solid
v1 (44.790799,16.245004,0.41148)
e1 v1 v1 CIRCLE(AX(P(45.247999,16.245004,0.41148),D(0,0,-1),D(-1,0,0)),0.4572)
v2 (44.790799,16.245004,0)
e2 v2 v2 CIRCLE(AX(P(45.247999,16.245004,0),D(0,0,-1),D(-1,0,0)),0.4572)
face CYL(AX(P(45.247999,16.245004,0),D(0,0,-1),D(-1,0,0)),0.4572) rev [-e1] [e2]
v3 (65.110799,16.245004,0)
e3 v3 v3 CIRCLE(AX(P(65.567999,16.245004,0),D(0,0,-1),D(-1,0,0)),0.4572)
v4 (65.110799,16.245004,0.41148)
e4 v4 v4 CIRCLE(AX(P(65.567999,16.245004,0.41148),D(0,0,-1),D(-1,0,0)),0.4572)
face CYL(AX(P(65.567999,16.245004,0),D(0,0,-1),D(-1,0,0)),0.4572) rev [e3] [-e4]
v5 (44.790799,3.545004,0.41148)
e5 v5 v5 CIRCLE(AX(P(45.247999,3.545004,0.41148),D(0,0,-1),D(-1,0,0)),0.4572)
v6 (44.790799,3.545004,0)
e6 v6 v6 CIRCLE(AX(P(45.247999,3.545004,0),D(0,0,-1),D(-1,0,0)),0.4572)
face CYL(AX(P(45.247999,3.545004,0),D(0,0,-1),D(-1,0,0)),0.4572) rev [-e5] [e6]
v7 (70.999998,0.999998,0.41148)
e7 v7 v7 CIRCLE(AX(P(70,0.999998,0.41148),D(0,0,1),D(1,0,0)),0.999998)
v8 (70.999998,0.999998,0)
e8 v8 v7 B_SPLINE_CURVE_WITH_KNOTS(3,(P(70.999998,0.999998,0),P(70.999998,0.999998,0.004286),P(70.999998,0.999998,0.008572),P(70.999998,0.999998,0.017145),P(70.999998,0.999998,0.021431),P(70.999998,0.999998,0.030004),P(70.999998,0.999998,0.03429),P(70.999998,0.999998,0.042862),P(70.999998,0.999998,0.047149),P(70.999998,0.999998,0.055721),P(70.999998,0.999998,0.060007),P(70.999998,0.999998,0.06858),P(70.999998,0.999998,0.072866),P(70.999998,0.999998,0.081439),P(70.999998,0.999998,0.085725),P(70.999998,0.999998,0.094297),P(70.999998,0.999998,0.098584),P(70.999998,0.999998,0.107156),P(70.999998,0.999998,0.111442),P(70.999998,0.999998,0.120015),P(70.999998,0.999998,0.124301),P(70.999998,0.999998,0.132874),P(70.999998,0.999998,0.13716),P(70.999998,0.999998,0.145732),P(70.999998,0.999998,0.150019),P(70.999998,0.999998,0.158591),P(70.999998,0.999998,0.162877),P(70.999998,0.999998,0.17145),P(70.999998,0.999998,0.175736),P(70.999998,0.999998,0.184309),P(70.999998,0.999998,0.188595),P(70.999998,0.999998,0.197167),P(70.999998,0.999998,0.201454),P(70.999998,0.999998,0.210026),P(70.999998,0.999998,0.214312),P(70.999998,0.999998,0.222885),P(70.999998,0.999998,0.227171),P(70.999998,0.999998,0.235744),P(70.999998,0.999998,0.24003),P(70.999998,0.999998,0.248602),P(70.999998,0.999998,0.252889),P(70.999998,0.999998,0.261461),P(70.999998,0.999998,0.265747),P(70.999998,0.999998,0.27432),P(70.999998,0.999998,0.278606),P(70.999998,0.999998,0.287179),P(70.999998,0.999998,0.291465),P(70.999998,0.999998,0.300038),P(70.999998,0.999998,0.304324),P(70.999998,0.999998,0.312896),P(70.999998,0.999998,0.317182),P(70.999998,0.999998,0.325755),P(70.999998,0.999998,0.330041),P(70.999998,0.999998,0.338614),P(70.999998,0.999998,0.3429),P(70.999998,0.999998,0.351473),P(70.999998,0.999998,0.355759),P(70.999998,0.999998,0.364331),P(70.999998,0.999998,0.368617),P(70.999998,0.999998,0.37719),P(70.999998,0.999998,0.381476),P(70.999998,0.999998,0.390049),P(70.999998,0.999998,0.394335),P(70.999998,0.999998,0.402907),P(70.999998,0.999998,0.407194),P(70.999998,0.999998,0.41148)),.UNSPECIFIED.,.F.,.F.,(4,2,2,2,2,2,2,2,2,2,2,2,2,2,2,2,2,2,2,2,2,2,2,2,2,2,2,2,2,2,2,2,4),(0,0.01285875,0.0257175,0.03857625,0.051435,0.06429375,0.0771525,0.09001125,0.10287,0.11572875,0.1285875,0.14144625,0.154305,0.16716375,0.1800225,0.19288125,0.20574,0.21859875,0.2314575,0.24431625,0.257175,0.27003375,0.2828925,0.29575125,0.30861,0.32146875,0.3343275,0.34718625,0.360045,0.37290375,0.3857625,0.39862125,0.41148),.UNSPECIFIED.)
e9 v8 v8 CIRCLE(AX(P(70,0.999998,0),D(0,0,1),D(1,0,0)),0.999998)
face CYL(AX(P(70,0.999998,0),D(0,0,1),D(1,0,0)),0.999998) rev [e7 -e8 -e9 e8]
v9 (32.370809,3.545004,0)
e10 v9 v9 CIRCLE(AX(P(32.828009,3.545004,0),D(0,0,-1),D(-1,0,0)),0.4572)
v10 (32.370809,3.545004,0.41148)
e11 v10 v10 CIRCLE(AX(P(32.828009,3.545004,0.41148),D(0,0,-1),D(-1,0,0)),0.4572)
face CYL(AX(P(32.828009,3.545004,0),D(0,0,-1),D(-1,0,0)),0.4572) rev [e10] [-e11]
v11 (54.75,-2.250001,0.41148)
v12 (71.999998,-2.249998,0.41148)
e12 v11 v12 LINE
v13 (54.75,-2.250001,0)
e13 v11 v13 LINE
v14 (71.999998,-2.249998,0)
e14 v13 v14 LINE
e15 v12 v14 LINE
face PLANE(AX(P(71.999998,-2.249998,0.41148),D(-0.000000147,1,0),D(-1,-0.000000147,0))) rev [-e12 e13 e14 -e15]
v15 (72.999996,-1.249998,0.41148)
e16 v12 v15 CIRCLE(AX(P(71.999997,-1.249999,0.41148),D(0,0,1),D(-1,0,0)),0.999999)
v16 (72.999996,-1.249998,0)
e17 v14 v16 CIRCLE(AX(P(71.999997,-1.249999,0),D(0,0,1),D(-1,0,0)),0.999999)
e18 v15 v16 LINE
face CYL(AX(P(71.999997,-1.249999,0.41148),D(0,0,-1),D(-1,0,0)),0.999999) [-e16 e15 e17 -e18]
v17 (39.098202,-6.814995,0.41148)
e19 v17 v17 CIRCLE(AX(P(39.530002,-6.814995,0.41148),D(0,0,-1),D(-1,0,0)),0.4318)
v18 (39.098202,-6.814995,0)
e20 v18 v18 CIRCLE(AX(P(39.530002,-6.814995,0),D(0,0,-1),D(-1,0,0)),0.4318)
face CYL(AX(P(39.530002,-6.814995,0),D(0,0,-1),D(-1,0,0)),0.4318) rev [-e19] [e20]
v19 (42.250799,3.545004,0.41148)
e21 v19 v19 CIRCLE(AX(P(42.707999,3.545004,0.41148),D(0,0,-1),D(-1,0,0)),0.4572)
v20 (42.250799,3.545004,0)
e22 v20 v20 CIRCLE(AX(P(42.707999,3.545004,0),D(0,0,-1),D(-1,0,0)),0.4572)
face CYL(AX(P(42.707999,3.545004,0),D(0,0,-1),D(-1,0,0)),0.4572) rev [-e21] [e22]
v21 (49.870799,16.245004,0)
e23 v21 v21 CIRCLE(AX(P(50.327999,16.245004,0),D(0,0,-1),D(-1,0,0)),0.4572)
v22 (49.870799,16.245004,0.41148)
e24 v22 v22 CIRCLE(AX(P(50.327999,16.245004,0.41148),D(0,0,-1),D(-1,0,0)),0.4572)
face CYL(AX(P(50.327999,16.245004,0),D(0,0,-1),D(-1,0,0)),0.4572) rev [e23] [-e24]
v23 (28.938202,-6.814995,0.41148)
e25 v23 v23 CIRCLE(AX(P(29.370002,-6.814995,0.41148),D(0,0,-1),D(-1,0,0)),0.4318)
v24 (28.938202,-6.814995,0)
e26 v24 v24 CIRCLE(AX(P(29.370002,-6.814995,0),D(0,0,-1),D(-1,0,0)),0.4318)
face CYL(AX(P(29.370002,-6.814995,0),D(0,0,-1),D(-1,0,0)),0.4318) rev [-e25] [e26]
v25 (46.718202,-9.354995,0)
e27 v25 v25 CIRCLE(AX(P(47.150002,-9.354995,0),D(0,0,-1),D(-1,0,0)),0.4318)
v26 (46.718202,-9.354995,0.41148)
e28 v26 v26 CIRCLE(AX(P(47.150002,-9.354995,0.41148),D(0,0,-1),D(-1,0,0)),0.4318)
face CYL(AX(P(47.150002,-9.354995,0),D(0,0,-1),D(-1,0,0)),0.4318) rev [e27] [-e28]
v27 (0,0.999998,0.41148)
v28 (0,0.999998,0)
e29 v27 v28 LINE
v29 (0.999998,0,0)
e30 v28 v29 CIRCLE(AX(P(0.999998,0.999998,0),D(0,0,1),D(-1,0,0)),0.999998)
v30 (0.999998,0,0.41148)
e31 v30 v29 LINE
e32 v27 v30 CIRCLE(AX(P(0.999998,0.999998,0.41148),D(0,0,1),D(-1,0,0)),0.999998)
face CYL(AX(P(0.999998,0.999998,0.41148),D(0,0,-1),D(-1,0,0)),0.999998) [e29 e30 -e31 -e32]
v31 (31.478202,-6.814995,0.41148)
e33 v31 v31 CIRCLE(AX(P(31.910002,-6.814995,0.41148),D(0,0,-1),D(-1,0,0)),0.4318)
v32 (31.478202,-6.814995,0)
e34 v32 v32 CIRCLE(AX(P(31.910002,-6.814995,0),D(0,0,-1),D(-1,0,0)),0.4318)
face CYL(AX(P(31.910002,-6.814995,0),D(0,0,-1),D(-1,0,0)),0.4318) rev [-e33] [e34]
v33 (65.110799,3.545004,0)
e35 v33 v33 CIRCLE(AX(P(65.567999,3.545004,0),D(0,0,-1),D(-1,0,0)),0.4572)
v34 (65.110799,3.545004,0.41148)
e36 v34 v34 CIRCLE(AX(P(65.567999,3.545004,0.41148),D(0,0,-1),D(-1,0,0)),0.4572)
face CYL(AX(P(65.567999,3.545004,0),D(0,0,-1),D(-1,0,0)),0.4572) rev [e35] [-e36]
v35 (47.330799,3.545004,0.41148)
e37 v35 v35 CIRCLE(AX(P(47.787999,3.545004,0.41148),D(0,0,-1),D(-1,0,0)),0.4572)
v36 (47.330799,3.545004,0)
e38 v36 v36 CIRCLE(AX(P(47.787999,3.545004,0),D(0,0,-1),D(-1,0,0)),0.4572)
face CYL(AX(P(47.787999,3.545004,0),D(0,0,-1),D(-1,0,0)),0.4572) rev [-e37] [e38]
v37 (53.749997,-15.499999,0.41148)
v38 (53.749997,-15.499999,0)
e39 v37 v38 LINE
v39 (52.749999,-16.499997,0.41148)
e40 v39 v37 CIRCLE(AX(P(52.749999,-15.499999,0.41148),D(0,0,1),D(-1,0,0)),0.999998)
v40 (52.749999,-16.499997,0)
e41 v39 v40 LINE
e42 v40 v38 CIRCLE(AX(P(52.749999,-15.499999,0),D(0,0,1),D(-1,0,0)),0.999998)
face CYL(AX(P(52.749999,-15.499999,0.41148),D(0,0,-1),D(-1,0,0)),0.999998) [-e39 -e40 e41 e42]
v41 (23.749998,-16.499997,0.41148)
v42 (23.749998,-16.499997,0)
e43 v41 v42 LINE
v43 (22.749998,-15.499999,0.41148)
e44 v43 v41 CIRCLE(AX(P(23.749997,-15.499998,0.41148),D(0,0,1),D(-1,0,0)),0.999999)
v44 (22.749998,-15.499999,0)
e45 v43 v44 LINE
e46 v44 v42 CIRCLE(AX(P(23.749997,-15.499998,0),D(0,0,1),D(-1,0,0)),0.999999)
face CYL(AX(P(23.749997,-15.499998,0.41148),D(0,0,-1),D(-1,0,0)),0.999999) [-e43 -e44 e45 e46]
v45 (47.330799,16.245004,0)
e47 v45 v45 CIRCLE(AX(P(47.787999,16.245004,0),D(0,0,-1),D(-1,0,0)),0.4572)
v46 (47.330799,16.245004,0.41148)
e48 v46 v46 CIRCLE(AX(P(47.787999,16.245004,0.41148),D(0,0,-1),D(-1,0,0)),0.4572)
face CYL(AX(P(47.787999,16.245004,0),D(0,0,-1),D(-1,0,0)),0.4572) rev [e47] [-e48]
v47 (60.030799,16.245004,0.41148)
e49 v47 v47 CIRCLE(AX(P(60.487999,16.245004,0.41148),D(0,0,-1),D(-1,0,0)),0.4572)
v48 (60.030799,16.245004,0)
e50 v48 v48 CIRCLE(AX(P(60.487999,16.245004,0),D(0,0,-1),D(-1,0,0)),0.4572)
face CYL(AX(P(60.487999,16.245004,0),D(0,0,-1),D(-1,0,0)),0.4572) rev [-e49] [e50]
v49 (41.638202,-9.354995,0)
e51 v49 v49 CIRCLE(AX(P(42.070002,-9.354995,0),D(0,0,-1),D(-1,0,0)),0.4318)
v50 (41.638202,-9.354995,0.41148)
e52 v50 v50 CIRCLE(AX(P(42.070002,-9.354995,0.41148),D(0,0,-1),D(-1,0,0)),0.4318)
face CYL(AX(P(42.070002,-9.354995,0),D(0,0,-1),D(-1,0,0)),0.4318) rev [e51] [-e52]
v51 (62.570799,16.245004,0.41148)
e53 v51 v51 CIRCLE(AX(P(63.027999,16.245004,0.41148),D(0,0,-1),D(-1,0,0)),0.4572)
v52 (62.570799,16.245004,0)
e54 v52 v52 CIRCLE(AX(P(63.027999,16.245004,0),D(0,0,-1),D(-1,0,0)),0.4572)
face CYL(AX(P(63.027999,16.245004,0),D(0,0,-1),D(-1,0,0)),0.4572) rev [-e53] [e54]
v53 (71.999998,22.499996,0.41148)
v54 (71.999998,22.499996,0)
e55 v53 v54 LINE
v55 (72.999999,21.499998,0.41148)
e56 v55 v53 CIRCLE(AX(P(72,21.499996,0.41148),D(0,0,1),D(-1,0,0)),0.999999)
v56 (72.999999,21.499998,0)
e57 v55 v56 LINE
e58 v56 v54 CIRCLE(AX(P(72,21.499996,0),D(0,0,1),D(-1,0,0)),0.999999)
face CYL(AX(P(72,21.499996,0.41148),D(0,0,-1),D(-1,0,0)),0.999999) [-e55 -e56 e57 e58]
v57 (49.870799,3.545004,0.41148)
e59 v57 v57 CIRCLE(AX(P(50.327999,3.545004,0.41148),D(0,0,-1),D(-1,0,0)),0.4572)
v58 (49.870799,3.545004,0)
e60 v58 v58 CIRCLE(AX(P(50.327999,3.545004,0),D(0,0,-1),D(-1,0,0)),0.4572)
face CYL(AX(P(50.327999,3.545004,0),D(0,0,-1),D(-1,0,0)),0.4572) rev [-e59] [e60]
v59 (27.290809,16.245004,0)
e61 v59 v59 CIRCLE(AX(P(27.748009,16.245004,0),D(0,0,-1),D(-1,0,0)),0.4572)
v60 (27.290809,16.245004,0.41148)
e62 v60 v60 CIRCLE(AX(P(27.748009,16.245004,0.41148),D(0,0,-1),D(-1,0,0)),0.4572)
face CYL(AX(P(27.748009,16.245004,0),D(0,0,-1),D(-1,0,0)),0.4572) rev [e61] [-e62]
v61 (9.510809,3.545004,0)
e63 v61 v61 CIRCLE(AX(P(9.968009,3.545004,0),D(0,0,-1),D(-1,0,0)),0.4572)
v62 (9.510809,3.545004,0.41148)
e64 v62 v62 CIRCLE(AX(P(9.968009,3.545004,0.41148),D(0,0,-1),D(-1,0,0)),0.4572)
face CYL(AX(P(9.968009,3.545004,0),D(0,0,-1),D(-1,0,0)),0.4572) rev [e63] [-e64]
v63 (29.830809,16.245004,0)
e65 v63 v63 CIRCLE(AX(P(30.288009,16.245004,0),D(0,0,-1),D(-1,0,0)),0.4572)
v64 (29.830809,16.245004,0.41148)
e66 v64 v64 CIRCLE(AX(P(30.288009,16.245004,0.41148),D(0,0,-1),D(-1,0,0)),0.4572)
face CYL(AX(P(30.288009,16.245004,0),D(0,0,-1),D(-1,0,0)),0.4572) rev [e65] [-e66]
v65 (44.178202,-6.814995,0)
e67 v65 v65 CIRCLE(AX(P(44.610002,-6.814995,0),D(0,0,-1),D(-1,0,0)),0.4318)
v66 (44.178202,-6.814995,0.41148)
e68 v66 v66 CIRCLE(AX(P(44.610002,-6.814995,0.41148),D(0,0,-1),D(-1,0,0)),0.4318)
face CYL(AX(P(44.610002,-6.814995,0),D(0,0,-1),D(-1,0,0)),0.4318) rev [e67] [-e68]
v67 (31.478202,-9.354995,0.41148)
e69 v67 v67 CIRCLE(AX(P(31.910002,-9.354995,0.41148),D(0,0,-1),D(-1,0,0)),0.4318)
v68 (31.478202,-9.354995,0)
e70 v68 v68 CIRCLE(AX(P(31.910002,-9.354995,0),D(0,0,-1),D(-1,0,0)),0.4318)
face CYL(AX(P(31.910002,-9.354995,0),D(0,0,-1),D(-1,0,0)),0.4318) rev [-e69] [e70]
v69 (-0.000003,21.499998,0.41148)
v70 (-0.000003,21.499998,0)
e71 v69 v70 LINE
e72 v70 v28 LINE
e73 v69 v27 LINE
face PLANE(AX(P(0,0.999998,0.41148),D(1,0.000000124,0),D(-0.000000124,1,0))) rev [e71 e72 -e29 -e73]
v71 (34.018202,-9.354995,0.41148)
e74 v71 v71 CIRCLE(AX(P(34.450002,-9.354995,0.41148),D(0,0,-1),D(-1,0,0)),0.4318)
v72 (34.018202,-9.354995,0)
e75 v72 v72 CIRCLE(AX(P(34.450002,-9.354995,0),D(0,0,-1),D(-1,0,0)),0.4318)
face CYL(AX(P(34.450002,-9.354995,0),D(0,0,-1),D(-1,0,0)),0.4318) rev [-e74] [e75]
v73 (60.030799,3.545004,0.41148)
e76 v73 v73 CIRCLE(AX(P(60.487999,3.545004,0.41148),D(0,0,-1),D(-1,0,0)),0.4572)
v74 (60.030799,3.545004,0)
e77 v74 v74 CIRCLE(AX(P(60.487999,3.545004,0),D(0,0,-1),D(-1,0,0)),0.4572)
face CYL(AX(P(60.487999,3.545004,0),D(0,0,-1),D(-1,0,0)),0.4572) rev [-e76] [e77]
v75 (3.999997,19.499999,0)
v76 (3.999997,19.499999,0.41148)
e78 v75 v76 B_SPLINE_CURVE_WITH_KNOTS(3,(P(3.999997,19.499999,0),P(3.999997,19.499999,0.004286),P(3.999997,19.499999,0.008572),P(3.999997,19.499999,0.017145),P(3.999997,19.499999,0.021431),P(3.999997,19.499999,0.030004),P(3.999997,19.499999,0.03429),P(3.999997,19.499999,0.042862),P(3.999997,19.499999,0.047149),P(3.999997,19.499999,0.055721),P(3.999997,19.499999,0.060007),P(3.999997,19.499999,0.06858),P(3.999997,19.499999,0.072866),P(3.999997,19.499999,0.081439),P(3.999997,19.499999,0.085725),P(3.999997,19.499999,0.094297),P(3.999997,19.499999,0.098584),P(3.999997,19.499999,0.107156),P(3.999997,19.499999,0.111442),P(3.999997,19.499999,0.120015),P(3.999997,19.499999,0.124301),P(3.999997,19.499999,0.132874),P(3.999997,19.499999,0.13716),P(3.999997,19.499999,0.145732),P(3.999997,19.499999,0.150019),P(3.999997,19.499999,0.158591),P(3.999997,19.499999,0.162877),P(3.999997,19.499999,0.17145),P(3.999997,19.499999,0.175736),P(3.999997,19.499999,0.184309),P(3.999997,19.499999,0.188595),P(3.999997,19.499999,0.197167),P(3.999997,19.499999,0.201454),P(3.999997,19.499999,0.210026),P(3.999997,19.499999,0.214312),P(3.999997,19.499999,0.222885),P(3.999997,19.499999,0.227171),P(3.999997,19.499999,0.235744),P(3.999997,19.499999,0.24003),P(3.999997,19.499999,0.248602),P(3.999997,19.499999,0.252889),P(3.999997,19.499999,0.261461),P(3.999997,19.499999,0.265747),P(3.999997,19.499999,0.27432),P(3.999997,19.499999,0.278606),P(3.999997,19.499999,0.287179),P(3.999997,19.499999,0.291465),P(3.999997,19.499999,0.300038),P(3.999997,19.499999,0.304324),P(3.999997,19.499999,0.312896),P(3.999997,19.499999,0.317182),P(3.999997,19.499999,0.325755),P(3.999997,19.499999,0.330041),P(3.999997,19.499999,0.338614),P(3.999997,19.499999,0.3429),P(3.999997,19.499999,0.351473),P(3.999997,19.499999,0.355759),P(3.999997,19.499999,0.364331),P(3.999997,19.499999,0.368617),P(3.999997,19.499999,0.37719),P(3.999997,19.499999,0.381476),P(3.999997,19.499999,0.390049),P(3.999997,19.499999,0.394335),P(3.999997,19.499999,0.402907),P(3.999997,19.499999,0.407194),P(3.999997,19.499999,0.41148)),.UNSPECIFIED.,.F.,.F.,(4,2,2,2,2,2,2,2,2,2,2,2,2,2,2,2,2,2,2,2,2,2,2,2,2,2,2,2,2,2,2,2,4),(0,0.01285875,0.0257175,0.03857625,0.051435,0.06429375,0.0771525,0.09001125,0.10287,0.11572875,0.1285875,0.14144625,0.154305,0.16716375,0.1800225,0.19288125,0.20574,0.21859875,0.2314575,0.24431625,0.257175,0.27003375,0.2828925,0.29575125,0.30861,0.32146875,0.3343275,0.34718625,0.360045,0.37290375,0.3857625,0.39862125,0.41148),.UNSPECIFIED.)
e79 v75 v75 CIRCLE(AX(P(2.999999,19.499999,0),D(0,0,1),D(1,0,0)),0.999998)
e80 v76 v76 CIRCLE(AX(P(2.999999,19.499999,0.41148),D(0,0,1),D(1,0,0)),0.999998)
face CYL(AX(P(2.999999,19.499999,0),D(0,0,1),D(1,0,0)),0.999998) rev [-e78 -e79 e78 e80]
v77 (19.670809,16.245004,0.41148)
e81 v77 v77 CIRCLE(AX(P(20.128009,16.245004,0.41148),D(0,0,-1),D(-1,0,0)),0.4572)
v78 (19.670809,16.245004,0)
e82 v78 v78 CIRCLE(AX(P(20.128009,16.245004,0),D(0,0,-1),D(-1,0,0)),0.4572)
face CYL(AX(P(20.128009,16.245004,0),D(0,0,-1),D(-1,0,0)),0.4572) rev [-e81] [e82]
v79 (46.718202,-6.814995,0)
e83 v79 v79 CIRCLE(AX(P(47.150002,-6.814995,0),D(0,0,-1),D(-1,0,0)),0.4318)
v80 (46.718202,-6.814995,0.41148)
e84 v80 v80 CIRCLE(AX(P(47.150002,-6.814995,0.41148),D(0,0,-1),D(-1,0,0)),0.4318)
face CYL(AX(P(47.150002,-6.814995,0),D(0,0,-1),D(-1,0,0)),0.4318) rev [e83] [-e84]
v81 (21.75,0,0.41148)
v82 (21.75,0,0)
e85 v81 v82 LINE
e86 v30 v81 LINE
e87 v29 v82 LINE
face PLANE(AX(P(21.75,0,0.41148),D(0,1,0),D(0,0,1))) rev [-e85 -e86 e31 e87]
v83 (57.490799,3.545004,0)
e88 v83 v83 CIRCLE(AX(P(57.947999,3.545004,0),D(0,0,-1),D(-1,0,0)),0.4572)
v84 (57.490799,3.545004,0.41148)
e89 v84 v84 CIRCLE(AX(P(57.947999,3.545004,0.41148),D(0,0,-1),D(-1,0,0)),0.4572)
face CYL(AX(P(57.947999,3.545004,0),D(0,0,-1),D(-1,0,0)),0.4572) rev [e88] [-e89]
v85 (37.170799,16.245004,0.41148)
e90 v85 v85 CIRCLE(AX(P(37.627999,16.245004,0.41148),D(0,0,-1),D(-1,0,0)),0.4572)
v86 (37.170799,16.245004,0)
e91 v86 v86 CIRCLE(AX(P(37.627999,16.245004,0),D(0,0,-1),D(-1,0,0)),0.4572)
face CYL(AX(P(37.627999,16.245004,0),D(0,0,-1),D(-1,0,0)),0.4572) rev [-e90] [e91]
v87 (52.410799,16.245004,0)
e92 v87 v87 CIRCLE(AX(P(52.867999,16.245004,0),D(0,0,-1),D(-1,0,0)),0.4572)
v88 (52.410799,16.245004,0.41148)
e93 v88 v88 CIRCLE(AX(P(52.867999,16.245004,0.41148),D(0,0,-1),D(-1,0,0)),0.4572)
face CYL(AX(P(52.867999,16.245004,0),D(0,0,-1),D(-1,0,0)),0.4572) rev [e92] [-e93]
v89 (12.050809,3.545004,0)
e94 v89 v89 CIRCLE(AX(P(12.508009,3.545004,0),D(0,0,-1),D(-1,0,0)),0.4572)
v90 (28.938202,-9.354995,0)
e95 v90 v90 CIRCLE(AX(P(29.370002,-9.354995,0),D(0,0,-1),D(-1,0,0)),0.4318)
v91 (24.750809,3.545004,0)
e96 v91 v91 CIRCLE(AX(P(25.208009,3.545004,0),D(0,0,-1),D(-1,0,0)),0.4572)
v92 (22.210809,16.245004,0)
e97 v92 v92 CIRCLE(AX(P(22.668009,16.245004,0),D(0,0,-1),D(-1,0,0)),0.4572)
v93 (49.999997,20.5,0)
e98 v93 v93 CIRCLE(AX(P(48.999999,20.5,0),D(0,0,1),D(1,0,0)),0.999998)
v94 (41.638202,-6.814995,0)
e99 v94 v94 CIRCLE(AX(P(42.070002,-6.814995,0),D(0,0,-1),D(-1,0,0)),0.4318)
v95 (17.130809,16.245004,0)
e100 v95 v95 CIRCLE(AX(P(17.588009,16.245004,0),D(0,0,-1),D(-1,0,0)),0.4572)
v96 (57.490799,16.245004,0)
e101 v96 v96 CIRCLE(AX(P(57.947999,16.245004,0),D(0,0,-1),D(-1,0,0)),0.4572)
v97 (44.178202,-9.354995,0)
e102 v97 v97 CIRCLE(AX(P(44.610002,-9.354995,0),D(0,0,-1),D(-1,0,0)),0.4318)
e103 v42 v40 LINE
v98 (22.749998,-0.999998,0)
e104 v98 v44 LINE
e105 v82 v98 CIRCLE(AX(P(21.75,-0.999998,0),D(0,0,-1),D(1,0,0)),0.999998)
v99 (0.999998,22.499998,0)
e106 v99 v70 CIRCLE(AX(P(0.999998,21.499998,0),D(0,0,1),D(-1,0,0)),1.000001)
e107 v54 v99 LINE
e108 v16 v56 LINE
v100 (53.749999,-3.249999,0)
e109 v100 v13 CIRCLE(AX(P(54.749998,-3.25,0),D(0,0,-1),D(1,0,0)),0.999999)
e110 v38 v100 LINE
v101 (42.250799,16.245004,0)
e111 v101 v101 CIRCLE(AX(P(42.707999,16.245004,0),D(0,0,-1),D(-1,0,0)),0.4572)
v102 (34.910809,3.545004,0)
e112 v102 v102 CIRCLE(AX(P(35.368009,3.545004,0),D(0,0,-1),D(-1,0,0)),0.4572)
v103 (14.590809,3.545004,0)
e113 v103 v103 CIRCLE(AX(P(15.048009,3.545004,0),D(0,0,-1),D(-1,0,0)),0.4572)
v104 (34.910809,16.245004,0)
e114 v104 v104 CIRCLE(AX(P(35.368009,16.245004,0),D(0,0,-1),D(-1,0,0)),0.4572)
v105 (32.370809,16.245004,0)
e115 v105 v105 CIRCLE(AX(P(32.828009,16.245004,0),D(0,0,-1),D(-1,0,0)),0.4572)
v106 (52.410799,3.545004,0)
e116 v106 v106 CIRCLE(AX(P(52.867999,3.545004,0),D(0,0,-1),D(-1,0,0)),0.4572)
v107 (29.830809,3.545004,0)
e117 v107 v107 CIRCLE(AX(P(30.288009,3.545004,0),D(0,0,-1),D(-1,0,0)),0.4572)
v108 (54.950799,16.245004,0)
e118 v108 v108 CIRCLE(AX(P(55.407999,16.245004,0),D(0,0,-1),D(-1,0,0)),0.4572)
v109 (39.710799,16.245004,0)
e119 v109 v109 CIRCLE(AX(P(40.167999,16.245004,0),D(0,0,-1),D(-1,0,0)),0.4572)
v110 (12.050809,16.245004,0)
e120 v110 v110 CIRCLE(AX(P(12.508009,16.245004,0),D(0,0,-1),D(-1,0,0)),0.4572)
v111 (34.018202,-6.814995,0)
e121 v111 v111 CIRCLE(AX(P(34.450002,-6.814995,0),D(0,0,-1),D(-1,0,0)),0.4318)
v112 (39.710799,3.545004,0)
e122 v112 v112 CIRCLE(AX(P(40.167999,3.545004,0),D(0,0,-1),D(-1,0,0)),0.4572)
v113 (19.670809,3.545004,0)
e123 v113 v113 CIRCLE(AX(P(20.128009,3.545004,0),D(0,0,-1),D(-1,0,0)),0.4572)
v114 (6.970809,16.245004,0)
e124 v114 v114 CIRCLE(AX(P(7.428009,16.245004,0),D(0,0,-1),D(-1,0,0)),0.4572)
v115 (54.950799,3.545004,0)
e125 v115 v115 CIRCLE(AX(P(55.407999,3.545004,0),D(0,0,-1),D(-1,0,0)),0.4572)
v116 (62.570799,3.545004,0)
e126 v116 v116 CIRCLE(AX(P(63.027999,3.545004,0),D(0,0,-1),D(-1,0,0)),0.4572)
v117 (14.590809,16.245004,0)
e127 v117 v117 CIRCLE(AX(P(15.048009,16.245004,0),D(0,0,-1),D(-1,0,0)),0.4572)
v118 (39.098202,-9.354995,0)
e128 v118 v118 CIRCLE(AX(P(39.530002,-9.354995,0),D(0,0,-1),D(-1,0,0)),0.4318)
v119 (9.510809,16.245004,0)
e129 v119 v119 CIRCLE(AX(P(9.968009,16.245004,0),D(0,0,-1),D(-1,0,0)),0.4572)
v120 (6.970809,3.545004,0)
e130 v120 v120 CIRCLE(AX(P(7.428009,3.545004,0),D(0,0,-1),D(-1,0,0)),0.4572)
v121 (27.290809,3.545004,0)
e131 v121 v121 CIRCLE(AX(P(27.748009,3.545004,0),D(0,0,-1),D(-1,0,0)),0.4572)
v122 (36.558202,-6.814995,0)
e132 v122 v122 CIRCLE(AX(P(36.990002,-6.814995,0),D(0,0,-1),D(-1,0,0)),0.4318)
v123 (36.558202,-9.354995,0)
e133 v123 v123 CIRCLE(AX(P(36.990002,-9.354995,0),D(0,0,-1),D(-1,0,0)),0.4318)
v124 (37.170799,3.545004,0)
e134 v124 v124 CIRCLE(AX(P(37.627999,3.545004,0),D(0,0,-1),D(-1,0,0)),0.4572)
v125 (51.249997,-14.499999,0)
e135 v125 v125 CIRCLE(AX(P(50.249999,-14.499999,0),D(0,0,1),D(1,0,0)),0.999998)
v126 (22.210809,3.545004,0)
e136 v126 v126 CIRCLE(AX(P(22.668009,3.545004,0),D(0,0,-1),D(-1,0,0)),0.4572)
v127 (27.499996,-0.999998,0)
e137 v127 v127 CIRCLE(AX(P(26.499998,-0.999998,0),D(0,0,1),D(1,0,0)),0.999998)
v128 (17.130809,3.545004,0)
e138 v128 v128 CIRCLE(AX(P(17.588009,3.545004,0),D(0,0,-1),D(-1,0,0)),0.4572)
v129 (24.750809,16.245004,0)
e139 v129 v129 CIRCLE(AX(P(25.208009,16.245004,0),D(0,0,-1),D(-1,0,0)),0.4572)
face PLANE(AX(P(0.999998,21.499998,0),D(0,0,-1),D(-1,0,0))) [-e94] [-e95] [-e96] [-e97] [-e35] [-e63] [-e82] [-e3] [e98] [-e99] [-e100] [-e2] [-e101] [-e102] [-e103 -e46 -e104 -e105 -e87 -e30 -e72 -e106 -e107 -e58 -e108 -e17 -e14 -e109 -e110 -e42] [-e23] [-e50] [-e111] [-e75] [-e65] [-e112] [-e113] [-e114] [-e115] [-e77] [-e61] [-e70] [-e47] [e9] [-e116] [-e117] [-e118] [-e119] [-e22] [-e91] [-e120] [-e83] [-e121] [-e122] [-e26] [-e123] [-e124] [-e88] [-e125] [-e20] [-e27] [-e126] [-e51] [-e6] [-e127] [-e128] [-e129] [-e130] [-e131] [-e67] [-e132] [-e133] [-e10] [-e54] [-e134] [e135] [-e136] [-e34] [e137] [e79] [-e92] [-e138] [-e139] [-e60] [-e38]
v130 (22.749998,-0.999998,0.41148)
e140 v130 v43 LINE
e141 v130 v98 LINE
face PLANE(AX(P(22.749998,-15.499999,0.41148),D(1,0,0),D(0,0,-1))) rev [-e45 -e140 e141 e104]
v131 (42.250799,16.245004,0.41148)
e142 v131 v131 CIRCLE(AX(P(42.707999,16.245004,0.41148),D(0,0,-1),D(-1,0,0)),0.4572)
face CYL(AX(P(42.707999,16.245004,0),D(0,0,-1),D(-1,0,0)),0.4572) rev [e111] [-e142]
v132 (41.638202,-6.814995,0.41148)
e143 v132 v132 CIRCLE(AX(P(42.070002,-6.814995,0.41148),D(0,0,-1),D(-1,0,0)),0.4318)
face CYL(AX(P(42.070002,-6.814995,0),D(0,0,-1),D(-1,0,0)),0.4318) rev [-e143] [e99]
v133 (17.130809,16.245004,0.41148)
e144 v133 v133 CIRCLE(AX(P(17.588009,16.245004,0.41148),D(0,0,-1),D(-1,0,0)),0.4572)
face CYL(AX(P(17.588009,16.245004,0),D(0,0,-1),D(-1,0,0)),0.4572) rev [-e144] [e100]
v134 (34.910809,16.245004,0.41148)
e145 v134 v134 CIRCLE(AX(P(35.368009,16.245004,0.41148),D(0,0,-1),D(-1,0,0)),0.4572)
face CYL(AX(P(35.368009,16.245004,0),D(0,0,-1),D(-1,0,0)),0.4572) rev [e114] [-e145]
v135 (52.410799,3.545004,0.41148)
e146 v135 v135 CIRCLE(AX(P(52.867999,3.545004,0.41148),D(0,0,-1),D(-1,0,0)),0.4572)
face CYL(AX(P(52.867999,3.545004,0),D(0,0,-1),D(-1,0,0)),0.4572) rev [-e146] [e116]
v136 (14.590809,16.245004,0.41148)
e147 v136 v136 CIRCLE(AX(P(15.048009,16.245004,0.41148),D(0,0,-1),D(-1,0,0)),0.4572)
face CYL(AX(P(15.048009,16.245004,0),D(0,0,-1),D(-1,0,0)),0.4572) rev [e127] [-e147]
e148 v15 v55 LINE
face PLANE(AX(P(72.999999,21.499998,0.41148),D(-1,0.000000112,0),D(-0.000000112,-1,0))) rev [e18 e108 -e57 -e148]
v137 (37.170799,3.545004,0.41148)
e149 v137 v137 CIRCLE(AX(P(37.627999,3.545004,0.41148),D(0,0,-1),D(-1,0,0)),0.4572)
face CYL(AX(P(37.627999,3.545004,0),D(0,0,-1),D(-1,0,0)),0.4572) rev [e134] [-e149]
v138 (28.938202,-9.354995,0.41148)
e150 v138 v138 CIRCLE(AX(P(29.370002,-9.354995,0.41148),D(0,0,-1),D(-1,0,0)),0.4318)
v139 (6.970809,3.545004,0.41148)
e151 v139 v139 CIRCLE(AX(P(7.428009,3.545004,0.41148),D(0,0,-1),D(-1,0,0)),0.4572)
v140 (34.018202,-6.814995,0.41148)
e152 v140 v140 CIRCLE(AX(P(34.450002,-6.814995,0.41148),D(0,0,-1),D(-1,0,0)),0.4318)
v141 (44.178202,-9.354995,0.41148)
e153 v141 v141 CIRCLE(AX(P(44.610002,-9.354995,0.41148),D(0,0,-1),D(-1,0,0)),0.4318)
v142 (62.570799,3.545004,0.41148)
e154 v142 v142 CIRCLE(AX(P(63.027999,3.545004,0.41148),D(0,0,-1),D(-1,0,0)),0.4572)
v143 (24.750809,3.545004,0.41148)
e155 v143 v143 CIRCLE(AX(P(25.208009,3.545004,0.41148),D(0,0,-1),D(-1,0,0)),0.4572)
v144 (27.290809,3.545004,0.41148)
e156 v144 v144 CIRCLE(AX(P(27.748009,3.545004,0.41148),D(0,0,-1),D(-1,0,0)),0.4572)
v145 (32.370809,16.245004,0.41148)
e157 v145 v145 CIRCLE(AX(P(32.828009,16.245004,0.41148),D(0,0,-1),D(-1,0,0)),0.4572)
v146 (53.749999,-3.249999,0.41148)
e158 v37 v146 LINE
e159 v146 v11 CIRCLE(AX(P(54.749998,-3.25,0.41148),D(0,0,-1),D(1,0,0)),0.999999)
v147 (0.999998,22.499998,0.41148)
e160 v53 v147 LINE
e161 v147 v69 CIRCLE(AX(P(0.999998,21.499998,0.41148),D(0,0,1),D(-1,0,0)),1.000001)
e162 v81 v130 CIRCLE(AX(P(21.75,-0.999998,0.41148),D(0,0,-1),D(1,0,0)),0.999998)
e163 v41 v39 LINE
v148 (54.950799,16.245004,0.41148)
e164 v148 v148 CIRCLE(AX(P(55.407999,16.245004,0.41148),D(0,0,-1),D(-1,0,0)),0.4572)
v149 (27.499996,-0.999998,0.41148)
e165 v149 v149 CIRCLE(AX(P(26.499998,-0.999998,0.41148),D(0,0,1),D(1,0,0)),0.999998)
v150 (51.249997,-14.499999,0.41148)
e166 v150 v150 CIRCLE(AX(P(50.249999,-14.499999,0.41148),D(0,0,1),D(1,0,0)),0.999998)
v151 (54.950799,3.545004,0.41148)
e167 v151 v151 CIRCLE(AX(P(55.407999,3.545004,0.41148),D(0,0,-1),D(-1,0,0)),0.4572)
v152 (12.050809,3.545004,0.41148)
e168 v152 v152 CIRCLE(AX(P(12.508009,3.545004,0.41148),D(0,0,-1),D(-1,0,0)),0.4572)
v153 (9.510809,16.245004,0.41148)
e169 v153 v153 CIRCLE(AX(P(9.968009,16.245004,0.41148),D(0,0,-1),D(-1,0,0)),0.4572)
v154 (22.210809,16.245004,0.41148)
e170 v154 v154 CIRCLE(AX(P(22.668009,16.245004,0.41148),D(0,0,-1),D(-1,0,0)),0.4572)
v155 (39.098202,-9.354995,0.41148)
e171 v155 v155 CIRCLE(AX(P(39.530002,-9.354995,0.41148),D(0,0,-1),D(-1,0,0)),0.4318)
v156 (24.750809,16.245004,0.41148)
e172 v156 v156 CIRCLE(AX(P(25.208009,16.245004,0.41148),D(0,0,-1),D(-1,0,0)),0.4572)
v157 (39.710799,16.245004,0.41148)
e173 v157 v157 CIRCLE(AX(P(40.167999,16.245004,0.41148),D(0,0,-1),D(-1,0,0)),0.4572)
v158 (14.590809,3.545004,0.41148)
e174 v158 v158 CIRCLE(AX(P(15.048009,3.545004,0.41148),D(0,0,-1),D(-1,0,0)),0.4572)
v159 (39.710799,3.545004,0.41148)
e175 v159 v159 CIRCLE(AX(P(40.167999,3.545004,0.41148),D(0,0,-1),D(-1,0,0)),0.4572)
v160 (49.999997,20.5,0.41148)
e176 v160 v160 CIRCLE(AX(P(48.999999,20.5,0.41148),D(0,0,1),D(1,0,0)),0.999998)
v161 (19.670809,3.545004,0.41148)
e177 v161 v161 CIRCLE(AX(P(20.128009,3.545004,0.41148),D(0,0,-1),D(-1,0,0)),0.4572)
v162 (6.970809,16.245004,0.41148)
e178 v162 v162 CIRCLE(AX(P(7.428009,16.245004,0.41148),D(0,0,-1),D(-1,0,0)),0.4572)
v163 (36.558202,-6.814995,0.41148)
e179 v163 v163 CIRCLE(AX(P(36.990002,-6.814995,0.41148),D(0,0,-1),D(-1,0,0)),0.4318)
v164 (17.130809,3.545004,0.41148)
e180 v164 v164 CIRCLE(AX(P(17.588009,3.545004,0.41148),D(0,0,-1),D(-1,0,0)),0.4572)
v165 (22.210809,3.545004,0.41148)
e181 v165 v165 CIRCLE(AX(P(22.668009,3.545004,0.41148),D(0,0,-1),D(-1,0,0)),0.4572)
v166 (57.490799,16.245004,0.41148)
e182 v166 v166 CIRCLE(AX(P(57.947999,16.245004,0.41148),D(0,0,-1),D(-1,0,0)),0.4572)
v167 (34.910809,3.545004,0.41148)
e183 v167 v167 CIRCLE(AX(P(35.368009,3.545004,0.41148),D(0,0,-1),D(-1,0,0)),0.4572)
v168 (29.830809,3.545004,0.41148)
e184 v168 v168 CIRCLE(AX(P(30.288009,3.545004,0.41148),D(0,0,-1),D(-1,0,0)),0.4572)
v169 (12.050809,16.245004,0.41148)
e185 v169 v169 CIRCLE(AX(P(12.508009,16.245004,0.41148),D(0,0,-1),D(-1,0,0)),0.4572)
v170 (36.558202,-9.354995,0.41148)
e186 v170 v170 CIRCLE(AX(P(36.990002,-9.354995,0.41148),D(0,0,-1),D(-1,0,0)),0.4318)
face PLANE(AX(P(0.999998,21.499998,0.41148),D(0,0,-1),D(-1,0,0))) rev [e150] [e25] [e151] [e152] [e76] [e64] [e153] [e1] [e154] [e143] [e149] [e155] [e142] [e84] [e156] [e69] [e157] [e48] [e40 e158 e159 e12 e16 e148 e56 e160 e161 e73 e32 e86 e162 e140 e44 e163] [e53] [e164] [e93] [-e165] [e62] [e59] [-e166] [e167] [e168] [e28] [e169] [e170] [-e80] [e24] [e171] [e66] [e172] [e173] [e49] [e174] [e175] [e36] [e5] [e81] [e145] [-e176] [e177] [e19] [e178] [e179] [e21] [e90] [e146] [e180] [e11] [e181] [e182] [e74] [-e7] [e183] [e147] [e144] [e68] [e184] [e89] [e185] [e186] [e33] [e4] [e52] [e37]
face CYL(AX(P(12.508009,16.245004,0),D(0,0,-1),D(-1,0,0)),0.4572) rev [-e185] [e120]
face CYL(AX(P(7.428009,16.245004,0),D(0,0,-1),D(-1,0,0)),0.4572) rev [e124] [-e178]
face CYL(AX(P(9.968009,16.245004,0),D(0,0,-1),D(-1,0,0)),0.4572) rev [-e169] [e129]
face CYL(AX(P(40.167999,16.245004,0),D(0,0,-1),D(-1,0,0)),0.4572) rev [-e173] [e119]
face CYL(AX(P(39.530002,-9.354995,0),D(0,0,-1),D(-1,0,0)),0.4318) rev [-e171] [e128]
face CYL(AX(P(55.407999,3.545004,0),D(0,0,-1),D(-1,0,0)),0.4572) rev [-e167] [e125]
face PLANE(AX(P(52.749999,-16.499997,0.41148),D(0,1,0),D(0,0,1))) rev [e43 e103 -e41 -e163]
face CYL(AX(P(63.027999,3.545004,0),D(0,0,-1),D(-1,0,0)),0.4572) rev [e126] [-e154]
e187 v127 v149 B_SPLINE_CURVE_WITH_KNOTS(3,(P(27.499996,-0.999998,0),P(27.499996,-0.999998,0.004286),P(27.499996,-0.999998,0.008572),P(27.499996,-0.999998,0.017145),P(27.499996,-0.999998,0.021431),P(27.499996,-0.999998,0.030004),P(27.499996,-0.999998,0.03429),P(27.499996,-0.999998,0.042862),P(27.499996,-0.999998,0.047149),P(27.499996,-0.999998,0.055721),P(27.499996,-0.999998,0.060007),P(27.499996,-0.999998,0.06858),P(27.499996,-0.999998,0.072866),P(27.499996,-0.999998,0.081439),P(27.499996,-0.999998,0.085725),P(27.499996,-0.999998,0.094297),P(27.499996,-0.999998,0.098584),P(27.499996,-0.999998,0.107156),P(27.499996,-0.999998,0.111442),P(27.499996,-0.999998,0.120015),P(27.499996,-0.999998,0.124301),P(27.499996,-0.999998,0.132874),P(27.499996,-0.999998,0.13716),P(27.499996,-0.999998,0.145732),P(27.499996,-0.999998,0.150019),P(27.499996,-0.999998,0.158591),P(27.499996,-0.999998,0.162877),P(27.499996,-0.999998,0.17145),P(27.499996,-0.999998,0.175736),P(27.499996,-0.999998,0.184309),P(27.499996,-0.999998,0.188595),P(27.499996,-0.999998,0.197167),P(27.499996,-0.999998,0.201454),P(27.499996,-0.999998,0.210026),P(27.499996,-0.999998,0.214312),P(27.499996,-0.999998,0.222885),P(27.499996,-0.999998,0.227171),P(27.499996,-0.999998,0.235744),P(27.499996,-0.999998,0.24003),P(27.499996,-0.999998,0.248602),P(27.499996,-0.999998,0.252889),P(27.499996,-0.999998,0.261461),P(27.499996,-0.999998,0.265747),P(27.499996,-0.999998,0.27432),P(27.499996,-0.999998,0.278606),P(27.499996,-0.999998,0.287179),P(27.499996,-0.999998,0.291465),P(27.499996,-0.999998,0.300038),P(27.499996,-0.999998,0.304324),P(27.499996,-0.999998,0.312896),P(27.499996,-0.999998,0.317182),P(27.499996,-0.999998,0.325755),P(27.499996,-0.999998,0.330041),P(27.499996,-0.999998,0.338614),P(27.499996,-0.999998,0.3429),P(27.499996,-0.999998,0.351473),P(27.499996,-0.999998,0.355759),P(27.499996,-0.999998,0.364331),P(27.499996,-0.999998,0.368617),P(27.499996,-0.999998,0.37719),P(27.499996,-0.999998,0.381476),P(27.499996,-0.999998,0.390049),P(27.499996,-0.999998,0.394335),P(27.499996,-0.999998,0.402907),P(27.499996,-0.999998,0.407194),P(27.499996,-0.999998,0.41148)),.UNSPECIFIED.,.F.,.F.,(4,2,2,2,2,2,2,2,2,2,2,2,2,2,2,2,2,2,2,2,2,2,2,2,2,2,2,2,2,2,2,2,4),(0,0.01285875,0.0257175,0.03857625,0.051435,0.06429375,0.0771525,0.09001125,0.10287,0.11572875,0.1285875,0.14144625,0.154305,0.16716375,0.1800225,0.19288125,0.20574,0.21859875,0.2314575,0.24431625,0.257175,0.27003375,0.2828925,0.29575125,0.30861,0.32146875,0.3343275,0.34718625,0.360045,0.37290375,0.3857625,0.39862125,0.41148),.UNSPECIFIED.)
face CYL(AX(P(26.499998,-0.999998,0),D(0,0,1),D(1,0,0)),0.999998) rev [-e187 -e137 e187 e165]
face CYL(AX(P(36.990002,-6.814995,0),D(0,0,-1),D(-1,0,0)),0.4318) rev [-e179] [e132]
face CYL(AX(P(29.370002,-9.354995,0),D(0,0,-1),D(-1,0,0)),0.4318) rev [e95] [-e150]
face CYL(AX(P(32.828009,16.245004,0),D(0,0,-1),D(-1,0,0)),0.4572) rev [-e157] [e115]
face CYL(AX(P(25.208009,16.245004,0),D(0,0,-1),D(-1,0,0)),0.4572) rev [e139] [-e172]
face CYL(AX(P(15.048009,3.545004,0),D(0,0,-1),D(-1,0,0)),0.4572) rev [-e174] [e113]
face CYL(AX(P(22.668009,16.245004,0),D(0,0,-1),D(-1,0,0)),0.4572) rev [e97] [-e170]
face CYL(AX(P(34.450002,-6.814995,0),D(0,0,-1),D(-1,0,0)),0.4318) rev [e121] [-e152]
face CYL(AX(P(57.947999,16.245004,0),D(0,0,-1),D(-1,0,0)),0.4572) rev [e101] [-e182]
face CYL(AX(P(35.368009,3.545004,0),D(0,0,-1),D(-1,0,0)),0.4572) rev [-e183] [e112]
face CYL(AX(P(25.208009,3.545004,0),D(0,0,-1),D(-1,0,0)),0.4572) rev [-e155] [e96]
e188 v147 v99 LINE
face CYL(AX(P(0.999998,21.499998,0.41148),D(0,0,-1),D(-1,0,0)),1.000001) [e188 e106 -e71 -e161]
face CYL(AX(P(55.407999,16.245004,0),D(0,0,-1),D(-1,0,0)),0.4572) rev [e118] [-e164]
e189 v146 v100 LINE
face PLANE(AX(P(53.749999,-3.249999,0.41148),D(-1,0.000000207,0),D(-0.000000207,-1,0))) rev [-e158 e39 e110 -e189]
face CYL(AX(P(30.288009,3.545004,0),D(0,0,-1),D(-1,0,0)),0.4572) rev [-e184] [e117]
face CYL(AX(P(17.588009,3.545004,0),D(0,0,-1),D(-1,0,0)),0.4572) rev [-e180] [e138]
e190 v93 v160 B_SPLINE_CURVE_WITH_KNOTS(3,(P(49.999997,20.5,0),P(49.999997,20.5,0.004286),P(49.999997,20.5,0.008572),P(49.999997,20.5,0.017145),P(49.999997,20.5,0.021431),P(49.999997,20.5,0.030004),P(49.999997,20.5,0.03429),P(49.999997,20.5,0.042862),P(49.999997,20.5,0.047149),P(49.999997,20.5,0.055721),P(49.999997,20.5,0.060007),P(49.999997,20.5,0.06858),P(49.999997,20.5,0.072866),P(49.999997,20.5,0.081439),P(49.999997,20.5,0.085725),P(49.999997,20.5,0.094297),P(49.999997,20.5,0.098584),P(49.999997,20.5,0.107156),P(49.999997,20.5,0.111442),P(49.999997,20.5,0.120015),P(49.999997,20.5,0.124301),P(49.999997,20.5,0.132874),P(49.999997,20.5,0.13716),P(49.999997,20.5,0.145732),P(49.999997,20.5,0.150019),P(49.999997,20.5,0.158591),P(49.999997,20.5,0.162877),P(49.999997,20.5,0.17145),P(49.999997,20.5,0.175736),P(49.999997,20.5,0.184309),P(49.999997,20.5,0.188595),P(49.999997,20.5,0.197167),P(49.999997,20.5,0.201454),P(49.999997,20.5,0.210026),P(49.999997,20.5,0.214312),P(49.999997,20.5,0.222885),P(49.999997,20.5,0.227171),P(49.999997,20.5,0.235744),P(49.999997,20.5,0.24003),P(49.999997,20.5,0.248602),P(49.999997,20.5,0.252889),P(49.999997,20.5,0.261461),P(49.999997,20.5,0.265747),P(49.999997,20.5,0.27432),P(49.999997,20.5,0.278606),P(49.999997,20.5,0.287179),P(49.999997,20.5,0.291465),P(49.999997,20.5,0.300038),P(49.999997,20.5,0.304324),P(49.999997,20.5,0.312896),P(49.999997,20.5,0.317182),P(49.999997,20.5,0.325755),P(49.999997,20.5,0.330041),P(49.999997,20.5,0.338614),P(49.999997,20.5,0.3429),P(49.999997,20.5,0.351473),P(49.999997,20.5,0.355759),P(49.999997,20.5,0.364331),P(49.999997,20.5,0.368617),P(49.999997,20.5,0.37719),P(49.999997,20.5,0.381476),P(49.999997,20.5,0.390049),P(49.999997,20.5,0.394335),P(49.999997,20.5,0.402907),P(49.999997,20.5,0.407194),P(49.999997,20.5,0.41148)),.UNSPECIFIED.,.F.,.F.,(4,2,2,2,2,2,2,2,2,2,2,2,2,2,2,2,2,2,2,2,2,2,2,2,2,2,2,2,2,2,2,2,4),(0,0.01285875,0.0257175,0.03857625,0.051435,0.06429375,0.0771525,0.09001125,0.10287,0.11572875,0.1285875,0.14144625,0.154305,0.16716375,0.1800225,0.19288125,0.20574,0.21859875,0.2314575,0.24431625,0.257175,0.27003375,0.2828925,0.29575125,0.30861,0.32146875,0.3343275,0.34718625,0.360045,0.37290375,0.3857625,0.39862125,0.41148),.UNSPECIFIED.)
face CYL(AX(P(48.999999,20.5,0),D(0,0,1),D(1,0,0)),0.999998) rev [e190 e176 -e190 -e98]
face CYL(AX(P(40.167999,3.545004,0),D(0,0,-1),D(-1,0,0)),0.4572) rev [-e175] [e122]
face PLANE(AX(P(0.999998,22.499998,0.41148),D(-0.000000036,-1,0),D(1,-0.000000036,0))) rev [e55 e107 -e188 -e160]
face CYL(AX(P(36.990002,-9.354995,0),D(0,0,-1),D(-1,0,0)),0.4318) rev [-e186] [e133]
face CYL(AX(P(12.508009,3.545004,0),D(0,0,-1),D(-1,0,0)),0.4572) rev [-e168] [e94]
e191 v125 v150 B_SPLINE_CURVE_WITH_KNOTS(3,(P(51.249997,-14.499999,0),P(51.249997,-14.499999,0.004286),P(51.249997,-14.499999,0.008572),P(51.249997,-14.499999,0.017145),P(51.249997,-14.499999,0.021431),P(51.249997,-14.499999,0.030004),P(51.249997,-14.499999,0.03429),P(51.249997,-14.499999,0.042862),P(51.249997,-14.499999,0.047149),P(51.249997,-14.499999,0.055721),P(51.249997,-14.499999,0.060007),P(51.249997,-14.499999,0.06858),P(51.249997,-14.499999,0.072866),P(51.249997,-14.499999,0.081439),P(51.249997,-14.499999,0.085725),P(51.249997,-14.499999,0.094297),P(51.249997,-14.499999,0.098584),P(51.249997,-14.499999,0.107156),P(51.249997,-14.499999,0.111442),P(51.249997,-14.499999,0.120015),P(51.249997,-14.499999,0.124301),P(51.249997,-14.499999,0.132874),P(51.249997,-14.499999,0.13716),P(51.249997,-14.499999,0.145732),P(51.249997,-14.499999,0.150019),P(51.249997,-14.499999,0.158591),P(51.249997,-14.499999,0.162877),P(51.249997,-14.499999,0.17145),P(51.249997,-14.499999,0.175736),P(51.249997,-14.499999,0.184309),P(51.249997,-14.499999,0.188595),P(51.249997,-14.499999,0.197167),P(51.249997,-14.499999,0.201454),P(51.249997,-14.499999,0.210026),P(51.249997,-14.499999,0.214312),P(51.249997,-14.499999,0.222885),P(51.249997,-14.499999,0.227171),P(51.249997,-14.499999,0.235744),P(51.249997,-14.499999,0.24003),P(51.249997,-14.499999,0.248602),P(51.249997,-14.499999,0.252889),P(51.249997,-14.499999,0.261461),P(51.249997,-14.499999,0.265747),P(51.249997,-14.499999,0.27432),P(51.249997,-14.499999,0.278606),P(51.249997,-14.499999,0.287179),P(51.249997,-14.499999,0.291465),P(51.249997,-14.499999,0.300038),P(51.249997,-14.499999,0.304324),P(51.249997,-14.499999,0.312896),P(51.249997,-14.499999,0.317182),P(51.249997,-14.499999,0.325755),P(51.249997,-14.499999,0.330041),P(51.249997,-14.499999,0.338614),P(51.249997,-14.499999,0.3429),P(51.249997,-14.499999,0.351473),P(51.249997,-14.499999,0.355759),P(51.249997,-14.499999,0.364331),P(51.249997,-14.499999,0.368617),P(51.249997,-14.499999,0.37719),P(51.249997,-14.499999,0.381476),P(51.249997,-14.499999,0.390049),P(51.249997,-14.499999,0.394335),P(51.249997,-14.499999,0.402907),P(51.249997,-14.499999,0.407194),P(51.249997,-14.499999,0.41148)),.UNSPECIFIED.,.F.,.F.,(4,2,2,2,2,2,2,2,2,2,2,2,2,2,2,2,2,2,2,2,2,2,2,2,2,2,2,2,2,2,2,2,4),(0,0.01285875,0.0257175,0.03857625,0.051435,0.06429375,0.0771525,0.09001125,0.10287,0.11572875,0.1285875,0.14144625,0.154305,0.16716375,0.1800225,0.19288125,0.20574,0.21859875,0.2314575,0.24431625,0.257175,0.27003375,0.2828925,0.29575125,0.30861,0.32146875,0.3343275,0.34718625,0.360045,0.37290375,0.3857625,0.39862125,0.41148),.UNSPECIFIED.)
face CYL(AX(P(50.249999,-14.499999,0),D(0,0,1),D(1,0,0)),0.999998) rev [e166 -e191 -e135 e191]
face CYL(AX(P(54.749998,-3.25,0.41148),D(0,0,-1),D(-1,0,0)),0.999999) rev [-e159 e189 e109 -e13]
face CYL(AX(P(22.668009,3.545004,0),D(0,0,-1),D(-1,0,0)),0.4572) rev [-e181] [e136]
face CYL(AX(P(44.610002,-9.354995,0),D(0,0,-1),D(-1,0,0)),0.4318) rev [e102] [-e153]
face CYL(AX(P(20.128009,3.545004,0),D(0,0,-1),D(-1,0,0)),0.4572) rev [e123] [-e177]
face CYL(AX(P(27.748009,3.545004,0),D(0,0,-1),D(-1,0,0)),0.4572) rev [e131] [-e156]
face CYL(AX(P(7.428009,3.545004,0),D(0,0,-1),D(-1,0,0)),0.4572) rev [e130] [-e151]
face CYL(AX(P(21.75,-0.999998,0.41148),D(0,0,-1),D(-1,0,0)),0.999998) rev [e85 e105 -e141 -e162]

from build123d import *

# Parameters (mm, degrees)
BOARD_DEPTH                        = 0.41148
F_1_0_228_DIAMETER_HOLE1_OUTLINE_R = 0.4572
F_1_0_228_DIAMETER_HOLE1_DEPTH     = 0.41148
F_1_0_228_DIAMETER_HOLE2_OUTLINE_R = 0.4318
F_1_0_228_DIAMETER_HOLE2_DEPTH     = 0.41148
SKETCH6_R                          = 0.999998
CUT_EXTRUDE1_DEPTH                 = 77.389914621
SKETCH7_R                          = 0.999998
CUT_EXTRUDE2_DEPTH                 = 77.389914621
SKETCH8_R                          = 0.999998
CUT_EXTRUDE3_DEPTH                 = 77.389914621
SKETCH9_R                          = 0.999998
CUT_EXTRUDE4_DEPTH                 = 77.389914621
SKETCH10_R                         = 0.999998
CUT_EXTRUDE5_DEPTH                 = 77.389914621


# Read off the part's stored shape, not the designer's step: #1 (0.228) Diameter Hole1, #1 (0.228) Diameter Hole2
with BuildPart() as part:
    # Sketch1 → Board (new body)
    with BuildSketch(Plane.XY):
        with BuildLine():
            Line((0.999998, 22.49999818), (71.99999824, 22.49999564))
            ThreePointArc((71.99999824, 22.49999564), (72.707104877, 22.207103533), (72.99999878, 21.49999764))
            Line((72.99999878, 21.49999764), (72.99999624, -1.2499975))
            ThreePointArc((72.99999624, -1.2499975), (72.707104133, -1.957104137), (71.99999824, -2.24999804))
            Line((71.99999824, -2.24999804), (54.74999972, -2.25000058))
            ThreePointArc((54.74999972, -2.25000058), (54.042893083, -2.542892687), (53.74999918, -3.24999858))
            Line((53.74999918, -3.24999858), (53.74999664, -15.49999948))
            ThreePointArc((53.74999664, -15.49999948), (53.457104007, -16.207104847), (52.74999864, -16.49999748))
            Line((52.74999864, -16.49999748), (23.74999822, -16.49999748))
            ThreePointArc((23.74999822, -16.49999748), (23.042891583, -16.207105373), (22.74999768, -15.49999948))
            Line((22.74999768, -15.49999948), (22.74999768, -0.999998))
            ThreePointArc((22.74999768, -0.999998), (22.457105047, -0.292892633), (21.74999968, 0))
            Line((21.74999968, 0), (0.999998, 0))
            ThreePointArc((0.999998, 0), (0.292892633, 0.292892633), (0, 0.999998))
            Line((0, 0.999998), (-2.54e-06, 21.49999764))
            ThreePointArc((-2.54e-06, 21.49999764), (0.292890837, 22.207104803), (0.999998, 22.49999818))
        make_face()
    extrude(amount=BOARD_DEPTH)

    # #1 (0.228) Diameter Hole1 outline → #1 (0.228) Diameter Hole1 (cut)
    with BuildSketch(Plane.XY):
        with Locations((37.62799942, 16.24500434)):
            Circle(F_1_0_228_DIAMETER_HOLE1_OUTLINE_R)
        with Locations((40.16799942, 16.24500434)):
            Circle(F_1_0_228_DIAMETER_HOLE1_OUTLINE_R)
        with Locations((42.70799942, 16.24500434)):
            Circle(F_1_0_228_DIAMETER_HOLE1_OUTLINE_R)
        with Locations((45.24799942, 16.24500434)):
            Circle(F_1_0_228_DIAMETER_HOLE1_OUTLINE_R)
        with Locations((47.78799942, 16.24500434)):
            Circle(F_1_0_228_DIAMETER_HOLE1_OUTLINE_R)
        with Locations((50.32799942, 16.24500434)):
            Circle(F_1_0_228_DIAMETER_HOLE1_OUTLINE_R)
        with Locations((52.86799942, 16.24500434)):
            Circle(F_1_0_228_DIAMETER_HOLE1_OUTLINE_R)
        with Locations((55.40799942, 16.24500434)):
            Circle(F_1_0_228_DIAMETER_HOLE1_OUTLINE_R)
        with Locations((57.94799942, 16.24500434)):
            Circle(F_1_0_228_DIAMETER_HOLE1_OUTLINE_R)
        with Locations((60.48799942, 16.24500434)):
            Circle(F_1_0_228_DIAMETER_HOLE1_OUTLINE_R)
        with Locations((63.02799942, 16.24500434)):
            Circle(F_1_0_228_DIAMETER_HOLE1_OUTLINE_R)
        with Locations((65.56799942, 16.24500434)):
            Circle(F_1_0_228_DIAMETER_HOLE1_OUTLINE_R)
        with Locations((65.56799942, 3.54500434)):
            Circle(F_1_0_228_DIAMETER_HOLE1_OUTLINE_R)
        with Locations((63.02799942, 3.54500434)):
            Circle(F_1_0_228_DIAMETER_HOLE1_OUTLINE_R)
        with Locations((60.48799942, 3.54500434)):
            Circle(F_1_0_228_DIAMETER_HOLE1_OUTLINE_R)
        with Locations((57.94799942, 3.54500434)):
            Circle(F_1_0_228_DIAMETER_HOLE1_OUTLINE_R)
        with Locations((55.40799942, 3.54500434)):
            Circle(F_1_0_228_DIAMETER_HOLE1_OUTLINE_R)
        with Locations((52.86799942, 3.54500434)):
            Circle(F_1_0_228_DIAMETER_HOLE1_OUTLINE_R)
        with Locations((50.32799942, 3.54500434)):
            Circle(F_1_0_228_DIAMETER_HOLE1_OUTLINE_R)
        with Locations((47.78799942, 3.54500434)):
            Circle(F_1_0_228_DIAMETER_HOLE1_OUTLINE_R)
        with Locations((45.24799942, 3.54500434)):
            Circle(F_1_0_228_DIAMETER_HOLE1_OUTLINE_R)
        with Locations((42.70799942, 3.54500434)):
            Circle(F_1_0_228_DIAMETER_HOLE1_OUTLINE_R)
        with Locations((40.16799942, 3.54500434)):
            Circle(F_1_0_228_DIAMETER_HOLE1_OUTLINE_R)
        with Locations((37.62799942, 3.54500434)):
            Circle(F_1_0_228_DIAMETER_HOLE1_OUTLINE_R)
        with Locations((7.42800902, 16.24500434)):
            Circle(F_1_0_228_DIAMETER_HOLE1_OUTLINE_R)
        with Locations((9.96800902, 16.24500434)):
            Circle(F_1_0_228_DIAMETER_HOLE1_OUTLINE_R)
        with Locations((12.50800902, 16.24500434)):
            Circle(F_1_0_228_DIAMETER_HOLE1_OUTLINE_R)
        with Locations((15.04800902, 16.24500434)):
            Circle(F_1_0_228_DIAMETER_HOLE1_OUTLINE_R)
        with Locations((17.58800902, 16.24500434)):
            Circle(F_1_0_228_DIAMETER_HOLE1_OUTLINE_R)
        with Locations((20.12800902, 16.24500434)):
            Circle(F_1_0_228_DIAMETER_HOLE1_OUTLINE_R)
        with Locations((22.66800902, 16.24500434)):
            Circle(F_1_0_228_DIAMETER_HOLE1_OUTLINE_R)
        with Locations((25.20800902, 16.24500434)):
            Circle(F_1_0_228_DIAMETER_HOLE1_OUTLINE_R)
        with Locations((27.74800902, 16.24500434)):
            Circle(F_1_0_228_DIAMETER_HOLE1_OUTLINE_R)
        with Locations((30.28800902, 16.24500434)):
            Circle(F_1_0_228_DIAMETER_HOLE1_OUTLINE_R)
        with Locations((32.82800902, 16.24500434)):
            Circle(F_1_0_228_DIAMETER_HOLE1_OUTLINE_R)
        with Locations((35.36800902, 16.24500434)):
            Circle(F_1_0_228_DIAMETER_HOLE1_OUTLINE_R)
        with Locations((35.36800902, 3.54500434)):
            Circle(F_1_0_228_DIAMETER_HOLE1_OUTLINE_R)
        with Locations((32.82800902, 3.54500434)):
            Circle(F_1_0_228_DIAMETER_HOLE1_OUTLINE_R)
        with Locations((30.28800902, 3.54500434)):
            Circle(F_1_0_228_DIAMETER_HOLE1_OUTLINE_R)
        with Locations((27.74800902, 3.54500434)):
            Circle(F_1_0_228_DIAMETER_HOLE1_OUTLINE_R)
        with Locations((25.20800902, 3.54500434)):
            Circle(F_1_0_228_DIAMETER_HOLE1_OUTLINE_R)
        with Locations((22.66800902, 3.54500434)):
            Circle(F_1_0_228_DIAMETER_HOLE1_OUTLINE_R)
        with Locations((20.12800902, 3.54500434)):
            Circle(F_1_0_228_DIAMETER_HOLE1_OUTLINE_R)
        with Locations((17.58800902, 3.54500434)):
            Circle(F_1_0_228_DIAMETER_HOLE1_OUTLINE_R)
        with Locations((15.04800902, 3.54500434)):
            Circle(F_1_0_228_DIAMETER_HOLE1_OUTLINE_R)
        with Locations((12.50800902, 3.54500434)):
            Circle(F_1_0_228_DIAMETER_HOLE1_OUTLINE_R)
        with Locations((9.96800902, 3.54500434)):
            Circle(F_1_0_228_DIAMETER_HOLE1_OUTLINE_R)
        with Locations((7.42800902, 3.54500434)):
            Circle(F_1_0_228_DIAMETER_HOLE1_OUTLINE_R)
    extrude(amount=F_1_0_228_DIAMETER_HOLE1_DEPTH, mode=Mode.SUBTRACT)

    # #1 (0.228) Diameter Hole2 outline → #1 (0.228) Diameter Hole2 (cut)
    with BuildSketch(Plane.XY):
        with Locations((47.15000222, -6.81499526)):
            Circle(F_1_0_228_DIAMETER_HOLE2_OUTLINE_R)
        with Locations((47.15000222, -9.35499526)):
            Circle(F_1_0_228_DIAMETER_HOLE2_OUTLINE_R)
        with Locations((44.61000222, -6.81499526)):
            Circle(F_1_0_228_DIAMETER_HOLE2_OUTLINE_R)
        with Locations((44.61000222, -9.35499526)):
            Circle(F_1_0_228_DIAMETER_HOLE2_OUTLINE_R)
        with Locations((42.07000222, -6.81499526)):
            Circle(F_1_0_228_DIAMETER_HOLE2_OUTLINE_R)
        with Locations((42.07000222, -9.35499526)):
            Circle(F_1_0_228_DIAMETER_HOLE2_OUTLINE_R)
        with Locations((39.53000222, -6.81499526)):
            Circle(F_1_0_228_DIAMETER_HOLE2_OUTLINE_R)
        with Locations((39.53000222, -9.35499526)):
            Circle(F_1_0_228_DIAMETER_HOLE2_OUTLINE_R)
        with Locations((36.99000222, -6.81499526)):
            Circle(F_1_0_228_DIAMETER_HOLE2_OUTLINE_R)
        with Locations((36.99000222, -9.35499526)):
            Circle(F_1_0_228_DIAMETER_HOLE2_OUTLINE_R)
        with Locations((34.45000222, -6.81499526)):
            Circle(F_1_0_228_DIAMETER_HOLE2_OUTLINE_R)
        with Locations((34.45000222, -9.35499526)):
            Circle(F_1_0_228_DIAMETER_HOLE2_OUTLINE_R)
        with Locations((31.91000222, -6.81499526)):
            Circle(F_1_0_228_DIAMETER_HOLE2_OUTLINE_R)
        with Locations((31.91000222, -9.35499526)):
            Circle(F_1_0_228_DIAMETER_HOLE2_OUTLINE_R)
        with Locations((29.37000222, -6.81499526)):
            Circle(F_1_0_228_DIAMETER_HOLE2_OUTLINE_R)
        with Locations((29.37000222, -9.35499526)):
            Circle(F_1_0_228_DIAMETER_HOLE2_OUTLINE_R)
    extrude(amount=F_1_0_228_DIAMETER_HOLE2_DEPTH, mode=Mode.SUBTRACT)

    # Sketch6 → Cut-Extrude1 (cut, through all)
    with BuildSketch(Plane.XY.offset(0.41148)):
        with Locations((50.24999856, -14.49999894)):
            Circle(SKETCH6_R)
    extrude(amount=-CUT_EXTRUDE1_DEPTH, mode=Mode.SUBTRACT)

    # Sketch7 → Cut-Extrude2 (cut, through all)
    with BuildSketch(Plane.XY.offset(0.41148)):
        with Locations((2.99999908, 19.4999991)):
            Circle(SKETCH7_R)
    extrude(amount=-CUT_EXTRUDE2_DEPTH, mode=Mode.SUBTRACT)

    # Sketch8 → Cut-Extrude3 (cut, through all)
    with BuildSketch(Plane.XY.offset(0.41148)):
        with Locations((48.99999852, 20.49999964)):
            Circle(SKETCH8_R)
    extrude(amount=-CUT_EXTRUDE3_DEPTH, mode=Mode.SUBTRACT)

    # Sketch9 → Cut-Extrude4 (cut, through all)
    with BuildSketch(Plane.XY.offset(0.41148)):
        with Locations((69.9999997, 0.999998)):
            Circle(SKETCH9_R)
    extrude(amount=-CUT_EXTRUDE4_DEPTH, mode=Mode.SUBTRACT)

    # Sketch10 → Cut-Extrude5 (cut, through all)
    with BuildSketch(Plane.XY.offset(0.41148)):
        with Locations((26.4999978, -0.999998)):
            Circle(SKETCH10_R)
    extrude(amount=-CUT_EXTRUDE5_DEPTH, mode=Mode.SUBTRACT)


solid = part.part
